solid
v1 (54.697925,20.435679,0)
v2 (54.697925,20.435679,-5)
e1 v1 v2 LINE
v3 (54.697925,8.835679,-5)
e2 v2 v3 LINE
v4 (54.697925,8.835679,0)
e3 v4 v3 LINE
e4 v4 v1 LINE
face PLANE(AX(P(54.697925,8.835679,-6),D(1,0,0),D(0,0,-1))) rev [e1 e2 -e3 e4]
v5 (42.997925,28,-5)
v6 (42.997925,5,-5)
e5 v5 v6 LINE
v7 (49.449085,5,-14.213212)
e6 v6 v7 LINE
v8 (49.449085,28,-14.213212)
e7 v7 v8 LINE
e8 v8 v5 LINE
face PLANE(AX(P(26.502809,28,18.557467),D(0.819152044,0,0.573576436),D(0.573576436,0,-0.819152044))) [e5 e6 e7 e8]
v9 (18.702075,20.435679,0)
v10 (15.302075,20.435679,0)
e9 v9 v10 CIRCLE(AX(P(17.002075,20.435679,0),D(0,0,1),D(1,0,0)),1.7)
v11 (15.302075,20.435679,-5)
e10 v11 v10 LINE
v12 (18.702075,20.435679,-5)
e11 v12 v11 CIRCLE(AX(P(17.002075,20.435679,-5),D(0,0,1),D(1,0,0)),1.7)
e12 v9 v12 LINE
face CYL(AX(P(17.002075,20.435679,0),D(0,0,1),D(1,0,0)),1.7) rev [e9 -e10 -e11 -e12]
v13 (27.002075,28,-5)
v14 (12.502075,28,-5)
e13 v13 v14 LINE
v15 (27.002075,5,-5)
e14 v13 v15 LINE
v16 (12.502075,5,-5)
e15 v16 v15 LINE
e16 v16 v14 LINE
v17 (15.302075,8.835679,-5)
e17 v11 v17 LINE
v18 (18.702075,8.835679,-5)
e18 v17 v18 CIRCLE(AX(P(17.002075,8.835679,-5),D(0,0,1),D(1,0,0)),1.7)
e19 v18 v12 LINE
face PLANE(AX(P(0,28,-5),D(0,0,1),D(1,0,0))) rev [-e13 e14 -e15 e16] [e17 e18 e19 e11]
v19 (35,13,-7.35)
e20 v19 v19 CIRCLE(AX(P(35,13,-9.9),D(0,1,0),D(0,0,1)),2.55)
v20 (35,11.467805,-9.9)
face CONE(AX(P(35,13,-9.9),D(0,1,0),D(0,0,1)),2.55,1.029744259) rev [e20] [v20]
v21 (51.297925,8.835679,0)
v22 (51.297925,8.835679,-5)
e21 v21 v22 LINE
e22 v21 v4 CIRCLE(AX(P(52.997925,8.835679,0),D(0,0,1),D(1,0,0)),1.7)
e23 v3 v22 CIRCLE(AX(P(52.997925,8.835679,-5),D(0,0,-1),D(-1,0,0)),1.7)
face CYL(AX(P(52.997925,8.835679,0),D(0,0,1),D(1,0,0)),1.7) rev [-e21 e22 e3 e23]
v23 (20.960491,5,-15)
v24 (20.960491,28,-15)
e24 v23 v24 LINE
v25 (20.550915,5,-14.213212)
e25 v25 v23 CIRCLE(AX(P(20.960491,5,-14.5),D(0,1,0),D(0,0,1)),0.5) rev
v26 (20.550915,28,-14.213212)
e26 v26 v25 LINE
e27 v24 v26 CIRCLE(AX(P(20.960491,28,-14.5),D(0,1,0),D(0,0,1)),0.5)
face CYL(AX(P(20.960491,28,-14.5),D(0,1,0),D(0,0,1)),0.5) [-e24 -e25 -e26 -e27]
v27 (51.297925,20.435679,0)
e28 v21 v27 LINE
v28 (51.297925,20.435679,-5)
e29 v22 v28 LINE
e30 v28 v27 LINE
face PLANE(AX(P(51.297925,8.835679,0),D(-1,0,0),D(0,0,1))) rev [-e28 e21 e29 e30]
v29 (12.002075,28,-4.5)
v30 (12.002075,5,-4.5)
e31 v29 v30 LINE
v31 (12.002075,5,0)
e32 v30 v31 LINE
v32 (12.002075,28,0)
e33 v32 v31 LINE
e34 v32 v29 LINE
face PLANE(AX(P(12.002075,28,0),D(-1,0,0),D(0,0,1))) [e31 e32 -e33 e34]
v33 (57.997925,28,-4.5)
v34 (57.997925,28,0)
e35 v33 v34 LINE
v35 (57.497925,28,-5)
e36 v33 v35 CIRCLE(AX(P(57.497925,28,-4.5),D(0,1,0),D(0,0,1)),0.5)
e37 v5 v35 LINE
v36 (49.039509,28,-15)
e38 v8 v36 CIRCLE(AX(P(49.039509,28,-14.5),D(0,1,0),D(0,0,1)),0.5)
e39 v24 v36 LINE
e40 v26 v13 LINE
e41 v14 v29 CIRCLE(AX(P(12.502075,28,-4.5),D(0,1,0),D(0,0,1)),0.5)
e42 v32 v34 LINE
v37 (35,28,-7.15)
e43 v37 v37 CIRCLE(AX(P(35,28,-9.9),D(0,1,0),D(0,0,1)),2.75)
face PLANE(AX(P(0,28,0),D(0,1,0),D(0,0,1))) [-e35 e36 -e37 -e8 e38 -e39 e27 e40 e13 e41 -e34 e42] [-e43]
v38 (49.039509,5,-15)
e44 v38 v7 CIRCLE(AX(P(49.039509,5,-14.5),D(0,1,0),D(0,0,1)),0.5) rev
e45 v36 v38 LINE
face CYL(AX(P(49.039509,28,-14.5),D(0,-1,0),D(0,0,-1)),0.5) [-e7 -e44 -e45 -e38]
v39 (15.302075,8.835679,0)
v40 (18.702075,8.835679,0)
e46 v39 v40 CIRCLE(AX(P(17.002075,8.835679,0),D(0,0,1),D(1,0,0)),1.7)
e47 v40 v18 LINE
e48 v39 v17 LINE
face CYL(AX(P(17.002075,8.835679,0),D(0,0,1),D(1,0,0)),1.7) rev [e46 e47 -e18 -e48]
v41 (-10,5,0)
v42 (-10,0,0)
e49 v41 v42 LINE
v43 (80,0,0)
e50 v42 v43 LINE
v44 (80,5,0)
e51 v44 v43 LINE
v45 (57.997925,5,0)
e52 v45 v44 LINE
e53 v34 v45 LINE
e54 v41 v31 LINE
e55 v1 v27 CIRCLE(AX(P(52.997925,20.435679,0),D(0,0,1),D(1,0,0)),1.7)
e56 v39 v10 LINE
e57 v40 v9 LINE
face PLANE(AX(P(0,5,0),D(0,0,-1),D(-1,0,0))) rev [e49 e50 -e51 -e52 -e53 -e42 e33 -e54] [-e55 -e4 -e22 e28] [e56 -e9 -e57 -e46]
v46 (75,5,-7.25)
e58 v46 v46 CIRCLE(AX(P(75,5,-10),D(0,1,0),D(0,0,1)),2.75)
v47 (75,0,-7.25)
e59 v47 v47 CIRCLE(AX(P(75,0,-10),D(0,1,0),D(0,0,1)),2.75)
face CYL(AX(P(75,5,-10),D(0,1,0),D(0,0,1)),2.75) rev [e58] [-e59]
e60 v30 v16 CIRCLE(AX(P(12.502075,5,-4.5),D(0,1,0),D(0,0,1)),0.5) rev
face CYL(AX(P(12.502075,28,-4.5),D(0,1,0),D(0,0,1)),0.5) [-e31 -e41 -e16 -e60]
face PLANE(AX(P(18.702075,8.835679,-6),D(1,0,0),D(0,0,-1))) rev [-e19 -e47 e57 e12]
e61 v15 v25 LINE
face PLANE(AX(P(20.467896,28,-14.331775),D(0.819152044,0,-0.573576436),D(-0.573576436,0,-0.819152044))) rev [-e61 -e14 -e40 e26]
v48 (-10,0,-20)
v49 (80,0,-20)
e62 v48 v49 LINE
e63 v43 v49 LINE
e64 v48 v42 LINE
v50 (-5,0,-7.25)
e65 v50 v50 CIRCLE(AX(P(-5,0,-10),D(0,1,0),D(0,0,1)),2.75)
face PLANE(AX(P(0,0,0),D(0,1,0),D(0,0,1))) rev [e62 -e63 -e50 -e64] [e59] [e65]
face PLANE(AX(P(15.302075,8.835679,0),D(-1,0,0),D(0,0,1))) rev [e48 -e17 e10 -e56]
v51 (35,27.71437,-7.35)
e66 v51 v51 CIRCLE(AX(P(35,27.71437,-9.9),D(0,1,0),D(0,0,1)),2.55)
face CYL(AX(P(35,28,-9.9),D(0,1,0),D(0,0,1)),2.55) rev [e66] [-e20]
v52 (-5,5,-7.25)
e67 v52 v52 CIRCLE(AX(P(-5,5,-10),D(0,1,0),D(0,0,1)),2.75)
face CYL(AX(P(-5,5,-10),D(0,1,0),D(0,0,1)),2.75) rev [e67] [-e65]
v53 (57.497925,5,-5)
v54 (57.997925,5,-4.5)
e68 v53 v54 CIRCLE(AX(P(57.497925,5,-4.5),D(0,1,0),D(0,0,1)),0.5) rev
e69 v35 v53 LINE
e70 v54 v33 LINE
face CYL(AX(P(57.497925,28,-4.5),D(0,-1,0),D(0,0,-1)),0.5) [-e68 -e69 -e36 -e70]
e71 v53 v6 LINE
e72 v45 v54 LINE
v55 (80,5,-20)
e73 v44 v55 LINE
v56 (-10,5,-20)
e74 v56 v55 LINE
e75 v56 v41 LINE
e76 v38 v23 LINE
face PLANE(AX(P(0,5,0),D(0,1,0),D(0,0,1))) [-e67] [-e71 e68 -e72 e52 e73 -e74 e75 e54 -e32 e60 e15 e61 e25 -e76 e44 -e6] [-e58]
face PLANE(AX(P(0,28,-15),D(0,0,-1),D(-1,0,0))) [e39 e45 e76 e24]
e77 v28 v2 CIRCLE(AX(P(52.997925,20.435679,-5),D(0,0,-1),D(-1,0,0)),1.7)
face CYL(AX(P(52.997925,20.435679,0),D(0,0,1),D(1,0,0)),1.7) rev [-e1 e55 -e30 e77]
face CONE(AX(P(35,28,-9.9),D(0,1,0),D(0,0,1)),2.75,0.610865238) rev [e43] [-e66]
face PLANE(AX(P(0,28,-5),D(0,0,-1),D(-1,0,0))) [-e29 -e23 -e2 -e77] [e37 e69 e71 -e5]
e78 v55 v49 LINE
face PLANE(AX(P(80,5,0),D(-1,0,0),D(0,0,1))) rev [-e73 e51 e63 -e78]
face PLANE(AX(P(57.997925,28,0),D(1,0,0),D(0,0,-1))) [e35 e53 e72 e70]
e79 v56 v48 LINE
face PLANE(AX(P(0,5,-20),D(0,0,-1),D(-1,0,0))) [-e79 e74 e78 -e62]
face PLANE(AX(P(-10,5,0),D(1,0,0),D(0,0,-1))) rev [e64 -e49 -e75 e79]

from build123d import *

# Parameters (mm, degrees)
SKETCH1_W                                       = 10
SKETCH1_H                                       = 20
BOSS_EXTRUDE1_DEPTH                             = 5
BOSS_EXTRUDE2_DEPTH                             = 28
M5_CLEARANCE_HOLE1_D                            = 5.5
M5_CLEARANCE_HOLE1_DEPTH                        = 10
M5_CLEARANCE_HOLE1_TIP                          = 1.652366702
CSK_FOR_M4_FLAT_HEAD_MACHINE_SCREW1_D           = 5.1
CSK_FOR_M4_FLAT_HEAD_MACHINE_SCREW1_DEPTH       = 15
CSK_FOR_M4_FLAT_HEAD_MACHINE_SCREW1_CSINK_D     = 5.5
CSK_FOR_M4_FLAT_HEAD_MACHINE_SCREW1_CSINK_ANGLE = 70
CSK_FOR_M4_FLAT_HEAD_MACHINE_SCREW1_TIP         = 1.532194579
FILLET1_R                                       = 0.5
M3_START                                        = -5
M3_CLEARANCE_SLOT1_DEPTH                        = 5


# Read off the part's stored shape, not the designer's step: M3 Clearance Slot1
with BuildPart() as part:
    # Sketch1 → Boss-Extrude1 (new body)
    with BuildSketch(Plane(origin=(0, 0, 0), x_dir=(1, 0, 0), z_dir=(0, 1, 0))):
        Polygon((0, 20), (0, 0), (12.002075382, 0), (12.002075382, 5), (27.002075382, 5), (20, 15), (50, 15), (42.997924618, 5), (57.997924618, 5), (57.997924618, 0), (70, 0), (70, 20), align=None)
        with Locations((-5, 10)):
            Rectangle(SKETCH1_W, SKETCH1_H)
        Polygon((12.002075382, 5), (12.002075382, 0), (57.997924618, 0), (57.997924618, 5), (42.997924618, 5), (50, 15), (20, 15), (27.002075382, 5), align=None)
        with Locations((75, 10)):
            Rectangle(SKETCH1_W, SKETCH1_H)
    extrude(amount=BOSS_EXTRUDE1_DEPTH)

    # Sketch1<3> → Boss-Extrude2 (add)
    with BuildSketch(Plane(origin=(0, 0, 0), x_dir=(1, 0, 0), z_dir=(0, 1, 0))):
        Polygon((12.002075382, 5), (12.002075382, 0), (57.997924618, 0), (57.997924618, 5), (42.997924618, 5), (50, 15), (20, 15), (27.002075382, 5), align=None)
    extrude(amount=BOSS_EXTRUDE2_DEPTH)

    # M5 Clearance Hole1
    with Locations(Plane(origin=(0, 5, 0), x_dir=(1, 0, 0), z_dir=(0, 1, 0))):
        with Locations((75, 10), (-5, 10)):
            Hole(M5_CLEARANCE_HOLE1_D / 2, depth=M5_CLEARANCE_HOLE1_DEPTH)
            with Locations((0, 0, -(M5_CLEARANCE_HOLE1_DEPTH + M5_CLEARANCE_HOLE1_TIP / 2))):  # 118° drill point
                Cone(0, M5_CLEARANCE_HOLE1_D / 2, M5_CLEARANCE_HOLE1_TIP, mode=Mode.SUBTRACT)

    # CSK for M4 Flat Head Machine Screw1
    with Locations(Plane(origin=(0, 28, 0), x_dir=(1, 0, 0), z_dir=(0, 1, 0))):
        with Locations((35, 9.9)):
            CounterSinkHole(CSK_FOR_M4_FLAT_HEAD_MACHINE_SCREW1_D / 2, CSK_FOR_M4_FLAT_HEAD_MACHINE_SCREW1_CSINK_D / 2, depth=CSK_FOR_M4_FLAT_HEAD_MACHINE_SCREW1_DEPTH, counter_sink_angle=CSK_FOR_M4_FLAT_HEAD_MACHINE_SCREW1_CSINK_ANGLE)
            with Locations((0, 0, -(CSK_FOR_M4_FLAT_HEAD_MACHINE_SCREW1_DEPTH + CSK_FOR_M4_FLAT_HEAD_MACHINE_SCREW1_TIP / 2))):  # 118° drill point
                Cone(0, CSK_FOR_M4_FLAT_HEAD_MACHINE_SCREW1_D / 2, CSK_FOR_M4_FLAT_HEAD_MACHINE_SCREW1_TIP, mode=Mode.SUBTRACT)

    # Fillet1
    fillet1_edges = [part.edges().sort_by_distance(p)[0] for p in [
        (12.002075382, 16.5, -5),
        (57.997924618, 16.5, -5),
        (50, 16.5, -15),
        (20, 16.5, -15),
    ]]
    fillet(fillet1_edges, radius=FILLET1_R)

    # M3 Clearance Slot1 outline → M3 Clearance Slot1 (cut)
    with BuildSketch(Plane.XY.offset(M3_START)):
        with BuildLine():
            Line((54.697924618, 8.835678671), (54.697924618, 20.435678671))
            ThreePointArc((54.697924618, 20.435678671), (52.997924618, 22.135678671), (51.297924618, 20.435678671))
            Line((51.297924618, 20.435678671), (51.297924618, 8.835678671))
            ThreePointArc((51.297924618, 8.835678671), (52.997924618, 7.135678671), (54.697924618, 8.835678671))
        make_face()
        with BuildLine():
            Line((18.702075382, 8.835678671), (18.702075382, 20.435678671))
            ThreePointArc((18.702075382, 20.435678671), (17.002075382, 22.135678671), (15.302075382, 20.435678671))
            Line((15.302075382, 20.435678671), (15.302075382, 8.835678671))
            ThreePointArc((15.302075382, 8.835678671), (17.002075382, 7.135678671), (18.702075382, 8.835678671))
        make_face()
    extrude(amount=M3_CLEARANCE_SLOT1_DEPTH, mode=Mode.SUBTRACT)


solid = part.part
